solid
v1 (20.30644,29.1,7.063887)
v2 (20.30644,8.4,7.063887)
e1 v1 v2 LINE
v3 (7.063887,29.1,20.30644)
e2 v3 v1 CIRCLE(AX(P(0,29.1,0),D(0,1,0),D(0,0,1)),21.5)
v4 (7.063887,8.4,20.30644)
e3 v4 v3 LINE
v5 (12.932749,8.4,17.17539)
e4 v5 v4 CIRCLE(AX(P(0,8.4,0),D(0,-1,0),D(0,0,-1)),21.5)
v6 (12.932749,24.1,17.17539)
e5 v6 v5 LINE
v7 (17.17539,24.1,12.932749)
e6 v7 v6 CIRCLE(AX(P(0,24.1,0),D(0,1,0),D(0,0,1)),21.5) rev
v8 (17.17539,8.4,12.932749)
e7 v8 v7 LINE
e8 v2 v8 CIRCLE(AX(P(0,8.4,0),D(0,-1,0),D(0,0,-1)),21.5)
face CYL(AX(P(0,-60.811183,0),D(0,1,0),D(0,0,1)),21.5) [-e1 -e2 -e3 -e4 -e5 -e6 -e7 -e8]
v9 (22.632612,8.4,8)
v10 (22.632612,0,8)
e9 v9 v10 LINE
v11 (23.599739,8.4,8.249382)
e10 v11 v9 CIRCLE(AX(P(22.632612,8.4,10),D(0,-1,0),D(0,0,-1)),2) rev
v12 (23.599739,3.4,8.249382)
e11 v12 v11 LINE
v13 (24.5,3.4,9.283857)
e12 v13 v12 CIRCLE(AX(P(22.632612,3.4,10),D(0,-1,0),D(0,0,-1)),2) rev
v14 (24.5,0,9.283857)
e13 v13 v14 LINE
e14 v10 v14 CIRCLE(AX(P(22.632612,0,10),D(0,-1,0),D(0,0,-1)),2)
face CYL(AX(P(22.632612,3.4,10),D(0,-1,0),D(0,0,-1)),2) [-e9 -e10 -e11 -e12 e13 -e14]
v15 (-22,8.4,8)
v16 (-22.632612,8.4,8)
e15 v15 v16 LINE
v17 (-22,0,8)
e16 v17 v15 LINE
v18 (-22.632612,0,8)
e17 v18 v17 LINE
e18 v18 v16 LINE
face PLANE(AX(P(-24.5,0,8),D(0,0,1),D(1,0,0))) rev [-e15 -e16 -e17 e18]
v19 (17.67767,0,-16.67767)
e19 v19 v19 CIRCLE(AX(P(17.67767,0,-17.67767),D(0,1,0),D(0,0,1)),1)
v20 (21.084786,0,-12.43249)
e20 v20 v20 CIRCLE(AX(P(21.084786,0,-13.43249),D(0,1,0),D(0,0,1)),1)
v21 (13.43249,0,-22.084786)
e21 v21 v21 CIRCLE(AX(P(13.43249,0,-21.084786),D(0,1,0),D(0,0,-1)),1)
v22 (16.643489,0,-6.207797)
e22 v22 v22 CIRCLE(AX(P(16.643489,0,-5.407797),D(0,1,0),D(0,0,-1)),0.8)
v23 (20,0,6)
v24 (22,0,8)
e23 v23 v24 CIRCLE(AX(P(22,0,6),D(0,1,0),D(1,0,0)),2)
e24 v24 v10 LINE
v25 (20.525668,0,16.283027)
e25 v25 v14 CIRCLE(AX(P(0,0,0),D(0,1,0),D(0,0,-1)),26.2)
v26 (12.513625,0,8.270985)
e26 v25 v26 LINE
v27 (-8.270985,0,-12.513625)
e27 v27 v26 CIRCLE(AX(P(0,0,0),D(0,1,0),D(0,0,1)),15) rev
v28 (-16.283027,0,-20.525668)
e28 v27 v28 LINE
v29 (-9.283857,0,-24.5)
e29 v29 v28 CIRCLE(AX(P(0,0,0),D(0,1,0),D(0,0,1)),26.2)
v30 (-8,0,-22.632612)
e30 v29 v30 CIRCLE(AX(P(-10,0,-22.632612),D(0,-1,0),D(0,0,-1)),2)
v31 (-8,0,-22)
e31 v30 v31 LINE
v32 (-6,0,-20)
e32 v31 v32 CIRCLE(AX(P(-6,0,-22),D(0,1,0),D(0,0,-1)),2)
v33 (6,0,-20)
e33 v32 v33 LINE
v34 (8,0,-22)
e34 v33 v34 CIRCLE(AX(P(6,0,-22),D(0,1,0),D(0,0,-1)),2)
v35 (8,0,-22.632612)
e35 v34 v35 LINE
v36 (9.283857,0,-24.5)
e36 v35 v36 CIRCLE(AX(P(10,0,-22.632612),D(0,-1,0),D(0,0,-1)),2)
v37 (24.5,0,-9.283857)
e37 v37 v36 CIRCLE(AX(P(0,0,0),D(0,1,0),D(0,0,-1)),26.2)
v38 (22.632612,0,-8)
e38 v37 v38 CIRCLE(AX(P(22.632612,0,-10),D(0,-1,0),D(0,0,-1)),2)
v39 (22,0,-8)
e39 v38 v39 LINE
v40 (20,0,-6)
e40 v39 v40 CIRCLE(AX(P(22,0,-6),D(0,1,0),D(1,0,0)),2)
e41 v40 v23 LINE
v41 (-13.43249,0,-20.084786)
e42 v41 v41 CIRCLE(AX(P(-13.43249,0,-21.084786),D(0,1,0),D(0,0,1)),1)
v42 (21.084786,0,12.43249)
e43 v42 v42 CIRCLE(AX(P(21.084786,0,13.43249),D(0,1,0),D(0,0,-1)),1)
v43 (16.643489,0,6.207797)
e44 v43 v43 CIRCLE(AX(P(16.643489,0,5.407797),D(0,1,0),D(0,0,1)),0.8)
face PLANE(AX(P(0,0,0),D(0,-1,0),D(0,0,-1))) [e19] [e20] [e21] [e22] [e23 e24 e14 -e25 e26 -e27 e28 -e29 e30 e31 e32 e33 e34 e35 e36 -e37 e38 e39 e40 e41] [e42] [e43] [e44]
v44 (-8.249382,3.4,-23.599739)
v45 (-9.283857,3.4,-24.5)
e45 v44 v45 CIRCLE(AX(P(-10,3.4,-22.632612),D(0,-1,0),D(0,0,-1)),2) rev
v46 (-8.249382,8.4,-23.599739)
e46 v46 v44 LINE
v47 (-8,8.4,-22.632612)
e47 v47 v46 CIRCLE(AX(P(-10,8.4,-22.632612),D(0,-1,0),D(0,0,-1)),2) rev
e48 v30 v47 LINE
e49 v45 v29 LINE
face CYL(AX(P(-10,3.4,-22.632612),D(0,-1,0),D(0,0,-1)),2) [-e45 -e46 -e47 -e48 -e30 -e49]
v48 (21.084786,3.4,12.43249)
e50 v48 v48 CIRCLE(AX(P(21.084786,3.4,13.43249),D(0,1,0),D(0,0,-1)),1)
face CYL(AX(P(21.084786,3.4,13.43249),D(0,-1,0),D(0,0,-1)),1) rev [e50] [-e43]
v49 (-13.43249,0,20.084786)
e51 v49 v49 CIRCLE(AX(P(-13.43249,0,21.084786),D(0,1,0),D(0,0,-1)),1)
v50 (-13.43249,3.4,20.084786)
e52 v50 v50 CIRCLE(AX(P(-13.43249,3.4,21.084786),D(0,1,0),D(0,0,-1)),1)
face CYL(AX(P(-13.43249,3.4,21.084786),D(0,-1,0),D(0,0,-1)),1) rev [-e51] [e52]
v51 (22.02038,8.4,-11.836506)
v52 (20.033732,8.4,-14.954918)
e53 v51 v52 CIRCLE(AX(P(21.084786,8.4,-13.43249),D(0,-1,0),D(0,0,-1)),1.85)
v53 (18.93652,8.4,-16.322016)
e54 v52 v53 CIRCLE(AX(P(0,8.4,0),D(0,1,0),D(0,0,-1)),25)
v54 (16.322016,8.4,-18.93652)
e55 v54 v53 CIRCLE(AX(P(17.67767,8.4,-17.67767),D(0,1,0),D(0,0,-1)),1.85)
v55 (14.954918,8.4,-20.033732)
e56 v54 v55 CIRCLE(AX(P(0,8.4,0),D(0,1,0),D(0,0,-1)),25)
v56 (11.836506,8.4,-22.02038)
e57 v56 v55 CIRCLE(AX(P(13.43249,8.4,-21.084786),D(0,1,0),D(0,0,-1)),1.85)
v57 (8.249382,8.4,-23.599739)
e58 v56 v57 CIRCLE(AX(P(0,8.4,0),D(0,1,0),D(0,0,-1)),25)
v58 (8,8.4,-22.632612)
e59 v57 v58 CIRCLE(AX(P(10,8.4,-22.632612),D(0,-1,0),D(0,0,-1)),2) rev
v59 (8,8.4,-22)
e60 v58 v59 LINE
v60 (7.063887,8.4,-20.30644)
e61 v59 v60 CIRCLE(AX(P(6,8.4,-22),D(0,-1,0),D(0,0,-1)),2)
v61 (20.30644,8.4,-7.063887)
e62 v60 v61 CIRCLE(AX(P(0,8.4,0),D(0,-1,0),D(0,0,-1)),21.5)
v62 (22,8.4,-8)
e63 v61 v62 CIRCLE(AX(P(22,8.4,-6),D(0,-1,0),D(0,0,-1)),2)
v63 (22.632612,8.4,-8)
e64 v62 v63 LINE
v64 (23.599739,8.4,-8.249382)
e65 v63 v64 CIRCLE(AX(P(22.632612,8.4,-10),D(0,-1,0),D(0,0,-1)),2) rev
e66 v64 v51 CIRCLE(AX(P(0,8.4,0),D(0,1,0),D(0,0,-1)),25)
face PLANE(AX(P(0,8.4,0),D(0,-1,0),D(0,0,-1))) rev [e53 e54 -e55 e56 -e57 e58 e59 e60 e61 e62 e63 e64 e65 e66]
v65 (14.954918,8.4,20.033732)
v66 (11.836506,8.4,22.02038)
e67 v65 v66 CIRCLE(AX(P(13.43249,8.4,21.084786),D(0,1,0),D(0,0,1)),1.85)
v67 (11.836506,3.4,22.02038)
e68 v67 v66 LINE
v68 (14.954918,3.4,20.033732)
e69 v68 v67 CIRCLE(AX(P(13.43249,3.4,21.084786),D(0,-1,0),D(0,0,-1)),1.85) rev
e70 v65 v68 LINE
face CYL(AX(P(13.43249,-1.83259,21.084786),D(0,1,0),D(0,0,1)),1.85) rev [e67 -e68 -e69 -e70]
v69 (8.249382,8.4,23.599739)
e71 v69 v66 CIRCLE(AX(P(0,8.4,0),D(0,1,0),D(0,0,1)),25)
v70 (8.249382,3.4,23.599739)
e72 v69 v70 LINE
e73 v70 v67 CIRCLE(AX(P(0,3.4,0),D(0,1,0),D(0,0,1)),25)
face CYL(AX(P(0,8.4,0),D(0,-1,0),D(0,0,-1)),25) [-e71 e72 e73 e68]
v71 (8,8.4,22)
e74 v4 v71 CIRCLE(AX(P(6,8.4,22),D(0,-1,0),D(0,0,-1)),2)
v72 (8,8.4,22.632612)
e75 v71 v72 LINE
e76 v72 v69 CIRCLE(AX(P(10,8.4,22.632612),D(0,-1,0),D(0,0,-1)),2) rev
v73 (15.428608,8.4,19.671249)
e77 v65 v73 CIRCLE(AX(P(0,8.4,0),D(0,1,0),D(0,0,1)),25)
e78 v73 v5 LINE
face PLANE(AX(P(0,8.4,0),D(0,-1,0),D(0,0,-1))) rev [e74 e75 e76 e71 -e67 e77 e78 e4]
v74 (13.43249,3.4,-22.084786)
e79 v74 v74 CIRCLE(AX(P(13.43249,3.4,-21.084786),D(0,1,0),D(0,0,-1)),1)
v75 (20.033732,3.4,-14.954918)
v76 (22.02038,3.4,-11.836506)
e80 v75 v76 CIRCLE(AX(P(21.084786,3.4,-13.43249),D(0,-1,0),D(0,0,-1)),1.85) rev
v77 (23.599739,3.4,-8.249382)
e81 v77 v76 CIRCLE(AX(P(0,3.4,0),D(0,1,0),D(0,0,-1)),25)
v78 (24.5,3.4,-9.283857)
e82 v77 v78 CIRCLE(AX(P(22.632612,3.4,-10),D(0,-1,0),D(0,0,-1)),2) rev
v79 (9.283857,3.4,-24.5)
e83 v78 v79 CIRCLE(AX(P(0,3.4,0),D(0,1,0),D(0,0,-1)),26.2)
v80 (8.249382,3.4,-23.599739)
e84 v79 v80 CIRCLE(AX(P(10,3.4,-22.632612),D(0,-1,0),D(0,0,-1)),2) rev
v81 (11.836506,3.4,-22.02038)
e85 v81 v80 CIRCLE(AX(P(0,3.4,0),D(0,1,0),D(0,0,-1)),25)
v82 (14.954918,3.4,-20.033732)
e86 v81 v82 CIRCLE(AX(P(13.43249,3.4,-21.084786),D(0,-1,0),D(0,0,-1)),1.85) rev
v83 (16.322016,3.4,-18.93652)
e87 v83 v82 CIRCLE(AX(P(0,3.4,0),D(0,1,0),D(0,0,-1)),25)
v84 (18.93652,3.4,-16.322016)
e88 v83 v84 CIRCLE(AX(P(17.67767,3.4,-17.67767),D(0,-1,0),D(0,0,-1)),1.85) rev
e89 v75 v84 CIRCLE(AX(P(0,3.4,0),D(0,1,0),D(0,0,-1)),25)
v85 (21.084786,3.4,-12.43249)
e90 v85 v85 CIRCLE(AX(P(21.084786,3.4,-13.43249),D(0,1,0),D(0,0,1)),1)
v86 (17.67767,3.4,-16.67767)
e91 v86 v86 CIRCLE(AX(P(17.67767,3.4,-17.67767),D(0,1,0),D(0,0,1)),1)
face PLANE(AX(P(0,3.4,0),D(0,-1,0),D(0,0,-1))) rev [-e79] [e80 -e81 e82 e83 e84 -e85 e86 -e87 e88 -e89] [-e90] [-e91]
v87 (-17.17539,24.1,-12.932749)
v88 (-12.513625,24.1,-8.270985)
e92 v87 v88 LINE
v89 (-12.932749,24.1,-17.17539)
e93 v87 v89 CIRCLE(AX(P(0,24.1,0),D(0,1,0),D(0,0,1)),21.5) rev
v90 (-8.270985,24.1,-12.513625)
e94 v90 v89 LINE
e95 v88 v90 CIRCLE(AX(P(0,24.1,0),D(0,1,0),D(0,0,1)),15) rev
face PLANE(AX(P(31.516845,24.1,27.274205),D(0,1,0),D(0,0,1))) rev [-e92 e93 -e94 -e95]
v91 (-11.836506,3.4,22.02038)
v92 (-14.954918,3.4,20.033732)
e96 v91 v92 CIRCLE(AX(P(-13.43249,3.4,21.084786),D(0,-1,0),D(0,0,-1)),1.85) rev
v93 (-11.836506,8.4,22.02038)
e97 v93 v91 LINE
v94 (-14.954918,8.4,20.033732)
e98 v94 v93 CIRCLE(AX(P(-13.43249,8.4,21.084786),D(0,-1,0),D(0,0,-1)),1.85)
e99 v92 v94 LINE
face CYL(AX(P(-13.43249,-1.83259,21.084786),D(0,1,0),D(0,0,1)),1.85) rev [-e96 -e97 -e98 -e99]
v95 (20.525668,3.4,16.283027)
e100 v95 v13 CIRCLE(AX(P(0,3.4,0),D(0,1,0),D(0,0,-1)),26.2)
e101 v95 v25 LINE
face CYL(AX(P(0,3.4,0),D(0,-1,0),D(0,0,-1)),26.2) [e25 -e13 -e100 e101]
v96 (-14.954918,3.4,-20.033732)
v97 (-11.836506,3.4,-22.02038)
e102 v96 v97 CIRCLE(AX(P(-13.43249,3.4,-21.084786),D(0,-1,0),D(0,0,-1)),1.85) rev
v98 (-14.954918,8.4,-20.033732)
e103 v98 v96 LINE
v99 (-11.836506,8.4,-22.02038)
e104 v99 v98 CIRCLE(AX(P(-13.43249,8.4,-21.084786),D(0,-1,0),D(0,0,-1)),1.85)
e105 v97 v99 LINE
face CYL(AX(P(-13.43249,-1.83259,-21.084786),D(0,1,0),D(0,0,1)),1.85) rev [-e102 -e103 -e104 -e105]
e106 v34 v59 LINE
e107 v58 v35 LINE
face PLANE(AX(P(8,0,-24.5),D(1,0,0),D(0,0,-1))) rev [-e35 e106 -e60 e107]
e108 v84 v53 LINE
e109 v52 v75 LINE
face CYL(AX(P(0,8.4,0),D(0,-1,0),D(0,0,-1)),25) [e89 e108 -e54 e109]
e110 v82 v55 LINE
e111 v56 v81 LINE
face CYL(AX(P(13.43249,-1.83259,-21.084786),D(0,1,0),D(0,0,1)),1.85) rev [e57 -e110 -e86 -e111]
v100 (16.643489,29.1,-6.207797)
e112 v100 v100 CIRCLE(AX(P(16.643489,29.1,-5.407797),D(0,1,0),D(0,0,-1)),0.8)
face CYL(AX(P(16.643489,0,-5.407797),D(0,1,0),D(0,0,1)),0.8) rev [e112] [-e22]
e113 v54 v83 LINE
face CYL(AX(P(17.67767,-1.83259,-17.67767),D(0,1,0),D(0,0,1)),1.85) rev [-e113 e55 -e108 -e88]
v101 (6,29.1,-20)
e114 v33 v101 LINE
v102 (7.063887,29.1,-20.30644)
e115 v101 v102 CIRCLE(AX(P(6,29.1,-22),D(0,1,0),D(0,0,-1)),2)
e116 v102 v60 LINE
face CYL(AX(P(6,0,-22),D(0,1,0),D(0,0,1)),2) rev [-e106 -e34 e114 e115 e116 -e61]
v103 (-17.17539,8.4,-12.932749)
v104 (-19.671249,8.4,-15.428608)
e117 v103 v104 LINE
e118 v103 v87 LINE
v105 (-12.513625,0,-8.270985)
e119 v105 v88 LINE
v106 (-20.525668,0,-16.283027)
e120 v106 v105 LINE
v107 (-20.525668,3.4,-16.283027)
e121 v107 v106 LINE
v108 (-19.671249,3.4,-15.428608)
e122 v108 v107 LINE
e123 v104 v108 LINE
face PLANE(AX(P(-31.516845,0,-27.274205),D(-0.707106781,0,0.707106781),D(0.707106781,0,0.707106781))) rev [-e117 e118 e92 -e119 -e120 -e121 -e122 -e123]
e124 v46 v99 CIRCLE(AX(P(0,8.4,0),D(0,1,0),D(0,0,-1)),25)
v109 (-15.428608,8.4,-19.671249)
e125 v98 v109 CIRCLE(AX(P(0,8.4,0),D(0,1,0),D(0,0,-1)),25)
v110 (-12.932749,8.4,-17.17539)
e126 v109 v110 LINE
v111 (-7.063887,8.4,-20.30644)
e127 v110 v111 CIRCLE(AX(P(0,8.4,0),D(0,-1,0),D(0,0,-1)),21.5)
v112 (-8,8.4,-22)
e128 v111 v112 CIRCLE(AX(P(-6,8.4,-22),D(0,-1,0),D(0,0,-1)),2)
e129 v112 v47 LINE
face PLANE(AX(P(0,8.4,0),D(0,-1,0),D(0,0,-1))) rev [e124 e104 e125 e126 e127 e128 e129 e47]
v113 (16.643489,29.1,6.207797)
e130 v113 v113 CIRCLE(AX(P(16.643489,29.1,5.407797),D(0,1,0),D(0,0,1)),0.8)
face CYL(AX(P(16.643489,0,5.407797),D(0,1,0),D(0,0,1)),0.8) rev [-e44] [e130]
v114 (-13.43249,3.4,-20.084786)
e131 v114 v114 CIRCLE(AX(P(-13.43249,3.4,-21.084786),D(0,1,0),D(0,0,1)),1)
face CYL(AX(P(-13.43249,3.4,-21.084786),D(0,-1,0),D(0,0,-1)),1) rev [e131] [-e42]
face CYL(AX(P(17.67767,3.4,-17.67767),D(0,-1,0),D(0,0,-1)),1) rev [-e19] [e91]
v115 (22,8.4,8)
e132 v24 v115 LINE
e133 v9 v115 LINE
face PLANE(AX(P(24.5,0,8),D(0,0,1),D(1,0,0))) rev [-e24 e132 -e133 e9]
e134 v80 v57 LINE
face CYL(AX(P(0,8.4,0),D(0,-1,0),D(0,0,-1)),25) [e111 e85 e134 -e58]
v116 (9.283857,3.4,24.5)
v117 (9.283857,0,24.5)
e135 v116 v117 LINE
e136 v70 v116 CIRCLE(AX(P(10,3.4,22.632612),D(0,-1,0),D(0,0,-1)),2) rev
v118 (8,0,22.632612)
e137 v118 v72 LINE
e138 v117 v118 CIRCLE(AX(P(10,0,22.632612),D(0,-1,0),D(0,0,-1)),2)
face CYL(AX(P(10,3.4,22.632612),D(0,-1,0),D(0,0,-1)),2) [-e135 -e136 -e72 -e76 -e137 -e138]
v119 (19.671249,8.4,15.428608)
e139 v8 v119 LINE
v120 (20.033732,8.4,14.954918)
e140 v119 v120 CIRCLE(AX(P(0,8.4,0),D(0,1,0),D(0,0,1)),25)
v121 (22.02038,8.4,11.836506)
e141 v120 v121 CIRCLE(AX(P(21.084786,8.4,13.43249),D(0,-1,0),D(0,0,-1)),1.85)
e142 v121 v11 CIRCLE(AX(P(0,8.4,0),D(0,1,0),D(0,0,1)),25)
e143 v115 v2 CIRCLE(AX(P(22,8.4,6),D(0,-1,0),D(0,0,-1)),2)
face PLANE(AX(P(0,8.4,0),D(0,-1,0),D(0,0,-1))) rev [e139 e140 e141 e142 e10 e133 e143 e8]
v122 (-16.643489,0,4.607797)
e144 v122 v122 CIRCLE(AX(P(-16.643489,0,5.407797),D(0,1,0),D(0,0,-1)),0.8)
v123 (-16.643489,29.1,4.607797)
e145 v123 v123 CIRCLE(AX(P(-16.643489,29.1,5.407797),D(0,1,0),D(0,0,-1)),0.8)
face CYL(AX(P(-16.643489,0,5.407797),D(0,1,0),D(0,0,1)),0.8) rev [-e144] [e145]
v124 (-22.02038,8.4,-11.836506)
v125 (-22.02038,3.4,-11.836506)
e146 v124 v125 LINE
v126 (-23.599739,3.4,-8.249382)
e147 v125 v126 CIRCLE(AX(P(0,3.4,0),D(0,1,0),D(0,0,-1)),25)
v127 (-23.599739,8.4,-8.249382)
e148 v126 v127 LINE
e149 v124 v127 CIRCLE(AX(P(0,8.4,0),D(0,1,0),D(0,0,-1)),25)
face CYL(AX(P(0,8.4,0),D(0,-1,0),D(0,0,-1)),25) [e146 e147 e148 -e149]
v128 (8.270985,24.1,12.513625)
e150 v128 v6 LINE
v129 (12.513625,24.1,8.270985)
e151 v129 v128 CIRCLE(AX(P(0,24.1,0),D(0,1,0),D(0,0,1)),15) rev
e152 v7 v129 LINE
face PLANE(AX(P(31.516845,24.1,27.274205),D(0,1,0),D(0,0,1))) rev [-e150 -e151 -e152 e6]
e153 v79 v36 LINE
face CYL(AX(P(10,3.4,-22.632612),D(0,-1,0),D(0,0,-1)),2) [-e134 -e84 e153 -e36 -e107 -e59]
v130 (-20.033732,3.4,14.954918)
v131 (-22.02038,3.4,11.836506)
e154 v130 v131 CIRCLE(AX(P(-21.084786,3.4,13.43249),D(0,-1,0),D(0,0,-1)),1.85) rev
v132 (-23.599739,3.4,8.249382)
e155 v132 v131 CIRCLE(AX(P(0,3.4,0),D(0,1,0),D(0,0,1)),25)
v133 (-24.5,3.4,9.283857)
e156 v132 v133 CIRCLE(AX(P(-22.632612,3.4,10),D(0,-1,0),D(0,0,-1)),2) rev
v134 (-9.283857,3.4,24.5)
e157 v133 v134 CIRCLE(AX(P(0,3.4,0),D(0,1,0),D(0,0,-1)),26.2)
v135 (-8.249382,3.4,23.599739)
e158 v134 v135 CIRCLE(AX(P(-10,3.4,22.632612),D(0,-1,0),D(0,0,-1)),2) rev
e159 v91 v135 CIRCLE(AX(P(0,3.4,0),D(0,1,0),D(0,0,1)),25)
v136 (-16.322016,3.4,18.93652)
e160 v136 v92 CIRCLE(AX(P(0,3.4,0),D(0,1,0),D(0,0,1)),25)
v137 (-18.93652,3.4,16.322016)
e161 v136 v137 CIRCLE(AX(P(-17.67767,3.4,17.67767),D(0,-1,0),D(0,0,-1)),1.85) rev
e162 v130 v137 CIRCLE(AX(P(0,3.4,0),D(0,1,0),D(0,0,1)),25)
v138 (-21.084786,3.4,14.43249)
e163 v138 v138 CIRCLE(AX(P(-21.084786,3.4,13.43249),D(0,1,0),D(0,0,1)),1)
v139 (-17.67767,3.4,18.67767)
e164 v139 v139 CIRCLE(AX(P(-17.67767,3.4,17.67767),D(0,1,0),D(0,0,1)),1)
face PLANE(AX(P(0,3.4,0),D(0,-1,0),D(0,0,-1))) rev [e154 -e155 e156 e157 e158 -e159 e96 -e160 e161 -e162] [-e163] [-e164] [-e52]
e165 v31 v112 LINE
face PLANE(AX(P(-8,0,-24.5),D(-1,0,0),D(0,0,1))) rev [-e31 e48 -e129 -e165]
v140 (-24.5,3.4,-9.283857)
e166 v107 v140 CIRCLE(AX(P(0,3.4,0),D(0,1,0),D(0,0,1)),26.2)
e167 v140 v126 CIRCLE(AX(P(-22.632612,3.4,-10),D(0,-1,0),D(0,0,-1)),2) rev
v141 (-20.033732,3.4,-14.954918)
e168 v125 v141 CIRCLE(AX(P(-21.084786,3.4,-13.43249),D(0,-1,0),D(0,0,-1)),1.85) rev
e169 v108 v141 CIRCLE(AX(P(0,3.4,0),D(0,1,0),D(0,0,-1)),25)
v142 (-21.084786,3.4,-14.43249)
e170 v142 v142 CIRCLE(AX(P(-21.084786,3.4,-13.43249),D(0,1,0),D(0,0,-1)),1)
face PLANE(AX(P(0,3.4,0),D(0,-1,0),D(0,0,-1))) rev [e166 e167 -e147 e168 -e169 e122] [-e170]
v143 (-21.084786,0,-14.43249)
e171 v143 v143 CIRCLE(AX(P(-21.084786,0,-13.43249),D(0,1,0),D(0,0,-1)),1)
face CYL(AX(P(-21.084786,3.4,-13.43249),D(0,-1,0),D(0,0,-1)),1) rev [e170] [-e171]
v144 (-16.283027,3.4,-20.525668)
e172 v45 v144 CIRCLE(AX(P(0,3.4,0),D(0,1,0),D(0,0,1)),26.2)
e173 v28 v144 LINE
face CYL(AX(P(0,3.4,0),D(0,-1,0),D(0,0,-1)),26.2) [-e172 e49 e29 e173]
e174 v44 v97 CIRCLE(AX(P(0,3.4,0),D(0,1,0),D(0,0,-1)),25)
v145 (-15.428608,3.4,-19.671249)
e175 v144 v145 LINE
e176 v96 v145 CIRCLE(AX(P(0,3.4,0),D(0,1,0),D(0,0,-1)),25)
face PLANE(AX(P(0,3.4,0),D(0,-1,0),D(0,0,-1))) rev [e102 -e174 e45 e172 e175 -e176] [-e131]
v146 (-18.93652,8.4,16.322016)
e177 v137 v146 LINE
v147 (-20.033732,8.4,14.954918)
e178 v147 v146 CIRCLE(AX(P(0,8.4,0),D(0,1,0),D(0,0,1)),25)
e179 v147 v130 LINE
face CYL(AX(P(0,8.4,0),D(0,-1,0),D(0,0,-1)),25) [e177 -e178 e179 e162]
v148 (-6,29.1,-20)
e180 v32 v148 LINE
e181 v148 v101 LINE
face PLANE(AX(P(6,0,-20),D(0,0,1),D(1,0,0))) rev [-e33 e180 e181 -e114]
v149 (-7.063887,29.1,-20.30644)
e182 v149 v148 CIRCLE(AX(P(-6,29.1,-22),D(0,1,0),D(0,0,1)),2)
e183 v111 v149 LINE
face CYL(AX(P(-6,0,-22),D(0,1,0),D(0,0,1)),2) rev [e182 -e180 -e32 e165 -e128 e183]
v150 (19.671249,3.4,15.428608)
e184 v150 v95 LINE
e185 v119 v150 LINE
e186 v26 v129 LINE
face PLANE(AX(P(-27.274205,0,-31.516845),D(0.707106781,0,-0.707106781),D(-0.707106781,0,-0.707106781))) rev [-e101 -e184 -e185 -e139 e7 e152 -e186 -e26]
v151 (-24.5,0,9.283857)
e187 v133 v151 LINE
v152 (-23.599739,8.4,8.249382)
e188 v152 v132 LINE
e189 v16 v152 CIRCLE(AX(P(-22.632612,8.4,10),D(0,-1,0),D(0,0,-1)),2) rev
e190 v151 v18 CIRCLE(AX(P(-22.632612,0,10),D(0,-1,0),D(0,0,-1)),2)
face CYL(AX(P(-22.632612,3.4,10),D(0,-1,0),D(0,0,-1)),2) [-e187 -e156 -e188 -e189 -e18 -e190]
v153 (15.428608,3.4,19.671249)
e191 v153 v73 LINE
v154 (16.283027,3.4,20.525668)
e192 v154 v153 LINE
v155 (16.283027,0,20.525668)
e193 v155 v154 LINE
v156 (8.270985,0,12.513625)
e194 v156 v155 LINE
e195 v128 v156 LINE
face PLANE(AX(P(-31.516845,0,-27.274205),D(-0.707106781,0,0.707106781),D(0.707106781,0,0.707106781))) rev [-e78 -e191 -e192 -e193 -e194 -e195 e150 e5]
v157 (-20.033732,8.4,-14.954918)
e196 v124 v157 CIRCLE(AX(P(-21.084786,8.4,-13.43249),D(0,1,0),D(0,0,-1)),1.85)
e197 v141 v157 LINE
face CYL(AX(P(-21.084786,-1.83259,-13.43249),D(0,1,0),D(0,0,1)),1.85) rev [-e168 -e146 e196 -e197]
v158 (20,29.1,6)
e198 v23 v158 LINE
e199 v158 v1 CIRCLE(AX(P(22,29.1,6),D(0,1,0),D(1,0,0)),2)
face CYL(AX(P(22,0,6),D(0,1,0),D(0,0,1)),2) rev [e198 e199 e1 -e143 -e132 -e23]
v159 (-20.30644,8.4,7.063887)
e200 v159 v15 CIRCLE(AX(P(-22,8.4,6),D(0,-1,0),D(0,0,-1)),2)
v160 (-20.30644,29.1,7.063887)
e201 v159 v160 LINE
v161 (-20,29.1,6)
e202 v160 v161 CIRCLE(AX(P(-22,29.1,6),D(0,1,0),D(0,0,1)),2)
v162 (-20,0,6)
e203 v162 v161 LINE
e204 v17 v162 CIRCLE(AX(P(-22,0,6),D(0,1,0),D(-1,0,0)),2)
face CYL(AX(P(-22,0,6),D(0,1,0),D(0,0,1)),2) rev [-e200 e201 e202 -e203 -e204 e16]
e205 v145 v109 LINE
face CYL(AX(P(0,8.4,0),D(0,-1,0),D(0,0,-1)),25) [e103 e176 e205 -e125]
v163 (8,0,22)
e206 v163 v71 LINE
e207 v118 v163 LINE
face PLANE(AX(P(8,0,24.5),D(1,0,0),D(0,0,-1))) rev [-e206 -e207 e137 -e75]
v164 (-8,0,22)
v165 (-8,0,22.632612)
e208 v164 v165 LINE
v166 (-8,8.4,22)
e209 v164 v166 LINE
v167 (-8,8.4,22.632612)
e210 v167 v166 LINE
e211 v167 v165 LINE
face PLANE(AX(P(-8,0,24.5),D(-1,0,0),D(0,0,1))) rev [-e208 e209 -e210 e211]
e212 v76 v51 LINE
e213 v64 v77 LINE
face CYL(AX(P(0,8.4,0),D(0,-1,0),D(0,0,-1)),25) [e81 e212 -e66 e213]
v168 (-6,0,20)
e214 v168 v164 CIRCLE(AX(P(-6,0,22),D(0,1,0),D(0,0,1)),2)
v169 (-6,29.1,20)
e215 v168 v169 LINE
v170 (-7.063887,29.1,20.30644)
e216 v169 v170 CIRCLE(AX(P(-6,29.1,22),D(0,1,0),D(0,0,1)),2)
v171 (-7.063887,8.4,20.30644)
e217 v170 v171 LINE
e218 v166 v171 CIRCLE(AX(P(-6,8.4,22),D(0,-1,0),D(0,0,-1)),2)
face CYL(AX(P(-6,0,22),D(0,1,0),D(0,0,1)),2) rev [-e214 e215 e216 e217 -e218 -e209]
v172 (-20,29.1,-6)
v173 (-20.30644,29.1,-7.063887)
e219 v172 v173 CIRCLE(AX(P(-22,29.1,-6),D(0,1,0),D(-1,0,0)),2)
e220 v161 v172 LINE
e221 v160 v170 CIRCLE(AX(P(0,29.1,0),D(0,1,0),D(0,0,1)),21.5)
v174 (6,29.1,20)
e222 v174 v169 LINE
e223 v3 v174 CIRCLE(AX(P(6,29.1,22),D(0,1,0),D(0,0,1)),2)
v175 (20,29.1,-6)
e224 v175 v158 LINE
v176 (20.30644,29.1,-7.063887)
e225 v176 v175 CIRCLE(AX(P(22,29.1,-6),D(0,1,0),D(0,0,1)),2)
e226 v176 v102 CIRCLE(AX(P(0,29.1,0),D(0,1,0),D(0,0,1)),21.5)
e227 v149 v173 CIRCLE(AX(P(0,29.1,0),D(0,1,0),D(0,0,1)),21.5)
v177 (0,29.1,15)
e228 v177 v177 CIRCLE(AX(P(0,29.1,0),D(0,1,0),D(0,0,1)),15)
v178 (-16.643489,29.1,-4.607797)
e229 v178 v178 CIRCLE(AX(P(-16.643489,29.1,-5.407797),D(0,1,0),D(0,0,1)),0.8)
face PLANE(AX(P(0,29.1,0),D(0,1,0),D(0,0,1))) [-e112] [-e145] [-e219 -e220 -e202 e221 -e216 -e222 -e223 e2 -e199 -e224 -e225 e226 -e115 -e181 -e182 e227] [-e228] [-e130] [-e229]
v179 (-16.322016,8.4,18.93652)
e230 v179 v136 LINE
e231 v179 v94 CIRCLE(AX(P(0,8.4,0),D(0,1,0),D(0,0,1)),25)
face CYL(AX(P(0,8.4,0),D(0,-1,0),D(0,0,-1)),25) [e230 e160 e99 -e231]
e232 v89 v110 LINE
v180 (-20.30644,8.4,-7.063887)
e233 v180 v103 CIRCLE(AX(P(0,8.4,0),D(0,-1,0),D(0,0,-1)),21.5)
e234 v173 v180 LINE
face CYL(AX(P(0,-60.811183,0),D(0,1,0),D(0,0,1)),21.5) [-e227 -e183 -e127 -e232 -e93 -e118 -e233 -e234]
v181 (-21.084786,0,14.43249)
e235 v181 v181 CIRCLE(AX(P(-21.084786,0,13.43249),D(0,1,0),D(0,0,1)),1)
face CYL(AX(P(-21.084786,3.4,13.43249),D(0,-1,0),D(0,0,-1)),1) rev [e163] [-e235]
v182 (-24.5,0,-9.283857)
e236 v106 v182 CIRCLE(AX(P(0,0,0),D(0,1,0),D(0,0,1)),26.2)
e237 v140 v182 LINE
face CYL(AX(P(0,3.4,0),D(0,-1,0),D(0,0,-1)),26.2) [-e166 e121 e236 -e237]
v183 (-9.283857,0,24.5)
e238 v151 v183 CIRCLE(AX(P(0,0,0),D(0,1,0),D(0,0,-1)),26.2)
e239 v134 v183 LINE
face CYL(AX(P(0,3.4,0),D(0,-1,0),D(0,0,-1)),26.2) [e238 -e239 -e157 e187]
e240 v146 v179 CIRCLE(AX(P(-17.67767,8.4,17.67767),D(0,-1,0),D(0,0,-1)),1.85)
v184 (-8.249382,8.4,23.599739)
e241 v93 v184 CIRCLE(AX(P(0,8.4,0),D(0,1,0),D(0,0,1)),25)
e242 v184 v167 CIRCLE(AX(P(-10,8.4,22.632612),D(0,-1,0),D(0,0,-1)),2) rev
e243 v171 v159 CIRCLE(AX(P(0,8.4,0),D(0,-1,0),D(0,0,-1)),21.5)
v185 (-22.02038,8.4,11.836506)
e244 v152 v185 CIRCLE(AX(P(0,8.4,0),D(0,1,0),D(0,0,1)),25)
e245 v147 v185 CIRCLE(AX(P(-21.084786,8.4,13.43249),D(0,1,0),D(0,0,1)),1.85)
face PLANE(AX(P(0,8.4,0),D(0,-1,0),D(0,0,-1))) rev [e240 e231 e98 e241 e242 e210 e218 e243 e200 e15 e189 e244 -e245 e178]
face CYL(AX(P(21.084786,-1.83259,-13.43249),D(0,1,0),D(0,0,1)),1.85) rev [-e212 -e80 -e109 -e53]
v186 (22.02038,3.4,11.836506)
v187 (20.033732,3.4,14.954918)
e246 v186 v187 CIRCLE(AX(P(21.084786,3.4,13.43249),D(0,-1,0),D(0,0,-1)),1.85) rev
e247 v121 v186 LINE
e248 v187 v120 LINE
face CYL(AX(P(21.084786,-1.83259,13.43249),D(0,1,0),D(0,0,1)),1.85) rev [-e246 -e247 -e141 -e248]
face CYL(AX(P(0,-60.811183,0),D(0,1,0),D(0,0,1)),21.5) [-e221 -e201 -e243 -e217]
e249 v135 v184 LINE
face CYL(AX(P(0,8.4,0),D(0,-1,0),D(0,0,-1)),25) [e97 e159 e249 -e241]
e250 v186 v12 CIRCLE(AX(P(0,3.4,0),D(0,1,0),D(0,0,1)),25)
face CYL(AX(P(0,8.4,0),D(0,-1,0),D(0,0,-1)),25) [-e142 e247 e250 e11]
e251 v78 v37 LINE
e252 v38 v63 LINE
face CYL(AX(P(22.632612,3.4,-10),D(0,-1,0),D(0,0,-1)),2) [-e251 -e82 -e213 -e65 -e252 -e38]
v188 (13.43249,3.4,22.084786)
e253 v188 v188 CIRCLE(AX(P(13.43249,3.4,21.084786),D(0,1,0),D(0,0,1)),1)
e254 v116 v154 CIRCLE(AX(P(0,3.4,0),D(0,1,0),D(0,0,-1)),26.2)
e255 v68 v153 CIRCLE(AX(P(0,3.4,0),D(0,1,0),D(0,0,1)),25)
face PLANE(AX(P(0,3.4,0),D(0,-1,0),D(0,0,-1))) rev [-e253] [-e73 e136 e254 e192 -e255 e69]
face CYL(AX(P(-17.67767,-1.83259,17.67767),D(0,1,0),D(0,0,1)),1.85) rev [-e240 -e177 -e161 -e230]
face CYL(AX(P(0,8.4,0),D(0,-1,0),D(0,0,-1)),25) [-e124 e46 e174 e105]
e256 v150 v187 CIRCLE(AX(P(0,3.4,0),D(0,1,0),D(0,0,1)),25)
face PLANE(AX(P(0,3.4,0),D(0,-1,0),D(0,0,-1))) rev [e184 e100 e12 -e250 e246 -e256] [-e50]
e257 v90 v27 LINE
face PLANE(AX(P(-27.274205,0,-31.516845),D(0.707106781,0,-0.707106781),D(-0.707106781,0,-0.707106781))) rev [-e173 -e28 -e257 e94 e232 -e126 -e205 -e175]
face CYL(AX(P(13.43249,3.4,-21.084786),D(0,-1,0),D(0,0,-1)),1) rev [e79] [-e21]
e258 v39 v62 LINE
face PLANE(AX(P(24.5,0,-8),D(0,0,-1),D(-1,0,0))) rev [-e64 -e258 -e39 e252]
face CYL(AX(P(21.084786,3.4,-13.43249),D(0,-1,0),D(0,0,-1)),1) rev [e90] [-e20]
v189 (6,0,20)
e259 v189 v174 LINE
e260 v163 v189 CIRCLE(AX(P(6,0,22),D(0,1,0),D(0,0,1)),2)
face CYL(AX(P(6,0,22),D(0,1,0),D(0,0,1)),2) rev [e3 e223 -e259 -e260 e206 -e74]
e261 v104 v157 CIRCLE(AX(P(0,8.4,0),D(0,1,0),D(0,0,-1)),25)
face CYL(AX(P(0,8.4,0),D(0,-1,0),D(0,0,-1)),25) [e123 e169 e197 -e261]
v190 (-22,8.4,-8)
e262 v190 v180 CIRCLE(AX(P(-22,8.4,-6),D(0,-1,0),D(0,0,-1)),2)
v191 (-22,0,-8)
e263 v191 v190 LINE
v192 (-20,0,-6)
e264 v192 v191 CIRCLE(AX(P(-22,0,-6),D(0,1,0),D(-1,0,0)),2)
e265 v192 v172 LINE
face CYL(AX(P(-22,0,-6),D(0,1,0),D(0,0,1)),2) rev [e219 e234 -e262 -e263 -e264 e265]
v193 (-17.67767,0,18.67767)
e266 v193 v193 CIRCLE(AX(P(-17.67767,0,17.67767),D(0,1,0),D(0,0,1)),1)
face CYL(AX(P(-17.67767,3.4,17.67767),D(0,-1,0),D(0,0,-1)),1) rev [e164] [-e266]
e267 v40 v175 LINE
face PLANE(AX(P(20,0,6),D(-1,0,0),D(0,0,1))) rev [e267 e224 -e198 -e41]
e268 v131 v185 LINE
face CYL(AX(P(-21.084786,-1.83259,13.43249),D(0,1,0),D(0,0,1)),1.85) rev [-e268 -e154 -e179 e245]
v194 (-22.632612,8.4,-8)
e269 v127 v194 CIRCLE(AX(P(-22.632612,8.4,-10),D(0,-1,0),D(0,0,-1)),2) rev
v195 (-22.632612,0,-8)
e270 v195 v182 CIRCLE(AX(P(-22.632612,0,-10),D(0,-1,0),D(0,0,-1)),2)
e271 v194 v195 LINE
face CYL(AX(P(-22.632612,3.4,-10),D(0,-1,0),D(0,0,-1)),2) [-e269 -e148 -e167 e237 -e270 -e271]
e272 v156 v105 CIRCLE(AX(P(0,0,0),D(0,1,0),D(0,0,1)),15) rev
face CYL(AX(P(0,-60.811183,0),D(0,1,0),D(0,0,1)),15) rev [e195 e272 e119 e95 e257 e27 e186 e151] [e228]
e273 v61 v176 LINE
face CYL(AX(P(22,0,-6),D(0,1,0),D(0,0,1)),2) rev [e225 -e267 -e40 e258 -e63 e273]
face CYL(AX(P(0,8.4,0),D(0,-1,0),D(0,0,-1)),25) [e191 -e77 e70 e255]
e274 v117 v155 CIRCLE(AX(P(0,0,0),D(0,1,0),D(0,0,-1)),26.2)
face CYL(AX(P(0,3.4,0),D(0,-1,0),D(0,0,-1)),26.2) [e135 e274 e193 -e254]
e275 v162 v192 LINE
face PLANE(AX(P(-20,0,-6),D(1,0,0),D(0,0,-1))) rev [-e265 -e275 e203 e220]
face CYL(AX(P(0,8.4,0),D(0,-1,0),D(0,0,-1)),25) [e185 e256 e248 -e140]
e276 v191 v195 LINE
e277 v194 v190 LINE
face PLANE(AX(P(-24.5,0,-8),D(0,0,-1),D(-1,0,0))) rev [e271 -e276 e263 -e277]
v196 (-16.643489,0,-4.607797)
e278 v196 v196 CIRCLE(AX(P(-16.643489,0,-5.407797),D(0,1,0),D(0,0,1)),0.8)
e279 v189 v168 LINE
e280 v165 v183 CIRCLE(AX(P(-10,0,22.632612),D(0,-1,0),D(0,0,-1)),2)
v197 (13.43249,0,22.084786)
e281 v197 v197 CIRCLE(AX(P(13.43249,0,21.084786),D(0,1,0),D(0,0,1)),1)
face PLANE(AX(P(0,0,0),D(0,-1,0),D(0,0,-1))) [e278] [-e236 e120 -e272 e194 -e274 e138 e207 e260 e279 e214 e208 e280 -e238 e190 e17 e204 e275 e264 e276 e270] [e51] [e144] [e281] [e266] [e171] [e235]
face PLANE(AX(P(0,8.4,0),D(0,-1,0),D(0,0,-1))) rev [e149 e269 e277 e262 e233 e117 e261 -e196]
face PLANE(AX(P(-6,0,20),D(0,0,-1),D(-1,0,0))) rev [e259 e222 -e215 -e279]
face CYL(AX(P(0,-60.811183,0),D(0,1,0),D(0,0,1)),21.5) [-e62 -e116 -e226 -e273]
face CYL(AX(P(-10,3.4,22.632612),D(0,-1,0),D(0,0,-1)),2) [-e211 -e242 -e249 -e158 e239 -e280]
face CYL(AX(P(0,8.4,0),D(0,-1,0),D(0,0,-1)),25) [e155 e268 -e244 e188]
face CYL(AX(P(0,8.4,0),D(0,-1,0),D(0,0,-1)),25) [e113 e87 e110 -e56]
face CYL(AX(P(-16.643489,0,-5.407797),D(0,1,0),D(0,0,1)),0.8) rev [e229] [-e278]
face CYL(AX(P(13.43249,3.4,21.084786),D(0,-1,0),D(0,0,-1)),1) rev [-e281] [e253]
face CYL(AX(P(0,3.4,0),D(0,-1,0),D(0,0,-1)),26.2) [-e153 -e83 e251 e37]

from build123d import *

# Parameters (mm, degrees)
SKETCH1_R                     = 1
BOSS_EXTRUDE1_DEPTH           = 3.4
BOSS_EXTRUDE3_DEPTH           = 5
SKETCH4_R                     = 1.85
CUT_EXTRUDE1_DEPTH            = 5
SKETCH9_R                     = 19
CENTER_HOLE_DEPTH             = 36.651928419
SKETCH2_R                     = 21.5
SKETCH2_R_2                   = 15
BOSS_EXTRUDE2_DEPTH           = 29.1
SKETCH27_R                    = 0.8
TOP_FACE_MOUNTING_HOLES_DEPTH = 46.247209859
CUT_EXTRUDE17_DEPTH           = 43.205568353
CUT_EXTRUDE10_DEPTH           = 41.360748259
CIRPATTERN3_COUNT             = 4
FILLET8_START                 = -1
FILLET8_DEPTH                 = 9.4


with BuildPart() as part:
    # Sketch1 → Boss-Extrude1 (new body)
    with BuildSketch(Plane(origin=(0, 0, 0), x_dir=(1, 0, 0), z_dir=(0, 1, 0))):
        with BuildLine():
            Line((9.283856957, 24.5), (-9.283856957, 24.5))
            ThreePointArc((-9.283856957, 24.5), (-18.526197667, 18.526197667), (-24.5, 9.283856957))
            Line((-24.5, 9.283856957), (-24.5, -9.283856957))
            ThreePointArc((-24.5, -9.283856957), (-18.526197667, -18.526197667), (-9.283856957, -24.5))
            Line((-9.283856957, -24.5), (9.283856957, -24.5))
            ThreePointArc((9.283856957, -24.5), (18.526197667, -18.526197667), (24.5, -9.283856957))
            Line((24.5, -9.283856957), (24.5, 9.283856957))
            ThreePointArc((24.5, 9.283856957), (18.526197667, 18.526197667), (9.283856957, 24.5))
        make_face()
        with Locations(Location((-13.432490209, 21.084786145, 0), (0, 0, 270))):
            Circle(SKETCH1_R, mode=Mode.SUBTRACT)
        with Locations(Location((-17.67766953, 17.67766953, 0), (0, 0, 270))):
            Circle(SKETCH1_R, mode=Mode.SUBTRACT)
        with Locations(Location((-21.084786145, 13.432490209, 0), (0, 0, 90))):
            Circle(SKETCH1_R, mode=Mode.SUBTRACT)
        with Locations(Location((21.084786145, 13.432490209, 0), (0, 0, 270))):
            Circle(SKETCH1_R, mode=Mode.SUBTRACT)
        with Locations(Location((17.67766953, 17.67766953, 0), (0, 0, 270))):
            Circle(SKETCH1_R, mode=Mode.SUBTRACT)
        with Locations(Location((13.432490209, 21.084786145, 0), (0, 0, 90))):
            Circle(SKETCH1_R, mode=Mode.SUBTRACT)
        with Locations(Location((13.432490209, -21.084786145, 0), (0, 0, 270))):
            Circle(SKETCH1_R, mode=Mode.SUBTRACT)
        with Locations(Location((17.67766953, -17.67766953, 0), (0, 0, 270))):
            Circle(SKETCH1_R, mode=Mode.SUBTRACT)
        with Locations(Location((21.084786145, -13.432490209, 0), (0, 0, 90))):
            Circle(SKETCH1_R, mode=Mode.SUBTRACT)
        with Locations(Location((-21.084786145, -13.432490209, 0), (0, 0, 270))):
            Circle(SKETCH1_R, mode=Mode.SUBTRACT)
        with Locations(Location((-17.67766953, -17.67766953, 0), (0, 0, 270))):
            Circle(SKETCH1_R, mode=Mode.SUBTRACT)
        with Locations(Location((-13.432490209, -21.084786145, 0), (0, 0, 90))):
            Circle(SKETCH1_R, mode=Mode.SUBTRACT)
    extrude(amount=BOSS_EXTRUDE1_DEPTH)

    # Sketch3 → Boss-Extrude3 (add)
    with BuildSketch(Plane(origin=(0, 3.4, 0), x_dir=(1, 0, 0), z_dir=(0, 1, 0))):
        with BuildLine():
            Line((-24.5, 4.974937186), (-24.5, -4.974937186))
            ThreePointArc((-24.5, -4.974937186), (-17.67766953, -17.67766953), (-4.974937186, -24.5))
            Line((-4.974937186, -24.5), (4.974937186, -24.5))
            ThreePointArc((4.974937186, -24.5), (17.67766953, -17.67766953), (24.5, -4.974937186))
            Line((24.5, -4.974937186), (24.5, 4.974937186))
            ThreePointArc((24.5, 4.974937186), (17.67766953, 17.67766953), (4.974937186, 24.5))
            Line((4.974937186, 24.5), (-4.974937186, 24.5))
            ThreePointArc((-4.974937186, 24.5), (-17.67766953, 17.67766953), (-24.5, 4.974937186))
        make_face()
    extrude(amount=BOSS_EXTRUDE3_DEPTH)

    # Sketch4 → Cut-Extrude1 (cut)
    with BuildSketch(Plane(origin=(0, 8.4, 0), x_dir=(1, 0, 0), z_dir=(0, 1, 0))):
        with Locations((-17.67766953, 17.67766953)):
            Circle(SKETCH4_R)
        with Locations((-13.432490209, 21.084786145)):
            Circle(SKETCH4_R)
        with Locations((-21.084786145, 13.432490209)):
            Circle(SKETCH4_R)
        with Locations((21.084786145, 13.432490209)):
            Circle(SKETCH4_R)
        with Locations((17.67766953, 17.67766953)):
            Circle(SKETCH4_R)
        with Locations((13.432490209, 21.084786145)):
            Circle(SKETCH4_R)
        with Locations((13.432490209, -21.084786145)):
            Circle(SKETCH4_R)
        with Locations((17.67766953, -17.67766953)):
            Circle(SKETCH4_R)
        with Locations((21.084786145, -13.432490209)):
            Circle(SKETCH4_R)
        with Locations((-21.084786145, -13.432490209)):
            Circle(SKETCH4_R)
        with Locations((-13.432490209, -21.084786145)):
            Circle(SKETCH4_R)
        with Locations((-17.67766953, -17.67766953)):
            Circle(SKETCH4_R)
    extrude(amount=-CUT_EXTRUDE1_DEPTH, mode=Mode.SUBTRACT)

    # Sketch9 → Center Hole (cut, through all)
    with BuildSketch(Plane(origin=(0, 8.4, 0), x_dir=(1, 0, 0), z_dir=(0, 1, 0))):
        with Locations(Location((0, 0, 0), (0, 0, 270))):
            Circle(SKETCH9_R)
    extrude(amount=-CENTER_HOLE_DEPTH, mode=Mode.SUBTRACT)

    # Sketch2 → Boss-Extrude2 (add)
    with BuildSketch(Plane(origin=(0, 29.1, 0), x_dir=(-1, 0, 0), z_dir=(0, 1, 0))):
        with Locations(Location((0, 0, 0), (0, 0, 90))):
            Circle(SKETCH2_R)
        with Locations(Location((0, 0, 0), (0, 0, 90))):
            Circle(SKETCH2_R_2, mode=Mode.SUBTRACT)
    extrude(amount=-BOSS_EXTRUDE2_DEPTH)

    # Sketch27 → Top Face Mounting Holes (cut, through all)
    with BuildSketch(Plane(origin=(0, 29.1, 0), x_dir=(1, 0, 0), z_dir=(0, 1, 0))):
        with Locations(Location((-16.643489035, 5.407797402, 0), (0, 0, 270))):
            Circle(SKETCH27_R)
        with Locations(Location((-16.643489035, -5.407797402, 0), (0, 0, 90))):
            Circle(SKETCH27_R)
        with Locations(Location((16.643489035, -5.407797402, 0), (0, 0, 270))):
            Circle(SKETCH27_R)
        with Locations(Location((16.643489035, 5.407797402, 0), (0, 0, 90))):
            Circle(SKETCH27_R)
    extrude(amount=-TOP_FACE_MOUNTING_HOLES_DEPTH, mode=Mode.SUBTRACT)

    # Sketch28 → Cut-Extrude17 (cut, through all)
    with BuildSketch(Plane(origin=(0, 24.1, 0), x_dir=(1, 0, 0), z_dir=(0, 1, 0))):
        Polygon((-31.516845347, 27.27420466), (27.27420466, -31.516845347), (31.516845347, -27.27420466), (-27.27420466, 31.516845347), align=None)
    extrude(amount=-CUT_EXTRUDE17_DEPTH, mode=Mode.SUBTRACT)

    # Sketch22 → Cut-Extrude10 (cut, symmetric)
    with BuildSketch(Plane(origin=(0, 8.4, 0), x_dir=(1, 0, 0), z_dir=(0, 1, 0))):
        with BuildLine():
            Line((8, 24.5), (-8, 24.5))
            Line((-8, 24.5), (-8, 22))
            ThreePointArc((-8, 22), (-7.414213562, 20.585786438), (-6, 20))
            Line((-6, 20), (6, 20))
            ThreePointArc((6, 20), (7.414213562, 20.585786438), (8, 22))
            Line((8, 22), (8, 24.5))
        make_face()
    cut_extrude10 = extrude(amount=CUT_EXTRUDE10_DEPTH, both=True, mode=Mode.SUBTRACT)

    # CirPattern3: Cut-Extrude10 ×4 about axis
    cirpattern3_axis = Axis((0, 0, 0), (0, 1, 0))
    for i in range(1, CIRPATTERN3_COUNT):
        add(cut_extrude10.rotate(cirpattern3_axis, i * 360 / CIRPATTERN3_COUNT), mode=Mode.SUBTRACT)

    # Fillet8: read off the stored shape, not the designer's step
    # Fillet8 outline → Fillet8 (cut)
    with BuildSketch(Plane(origin=(0, 0, 0), x_dir=(1, 0, 0), z_dir=(0, 1, 0)).offset(FILLET8_START)):
        with BuildLine():
            Line((24.5, 8), (24.5, 9.283856957))
            ThreePointArc((24.5, 9.283856957), (23.765685797, 8.351927476), (22.632611679, 8))
            Line((22.632611679, 8), (24.5, 8))
        make_face()
        with BuildLine():
            Line((24.5, -8), (22.632611679, -8))
            ThreePointArc((22.632611679, -8), (23.765685797, -8.351927476), (24.5, -9.283856957))
            Line((24.5, -9.283856957), (24.5, -8))
        make_face()
        with BuildLine():
            Line((8, -24.5), (9.283856957, -24.5))
            ThreePointArc((9.283856957, -24.5), (8.351927476, -23.765685797), (8, -22.632611679))
            Line((8, -22.632611679), (8, -24.5))
        make_face()
        with BuildLine():
            Line((-8, -24.5), (-8, -22.632611679))
            ThreePointArc((-8, -22.632611679), (-8.351927476, -23.765685797), (-9.283856957, -24.5))
            Line((-9.283856957, -24.5), (-8, -24.5))
        make_face()
        with BuildLine():
            Line((-24.5, -8), (-24.5, -9.283856957))
            ThreePointArc((-24.5, -9.283856957), (-23.765685797, -8.351927476), (-22.632611679, -8))
            Line((-22.632611679, -8), (-24.5, -8))
        make_face()
        with BuildLine():
            Line((-24.5, 8), (-22.632611679, 8))
            ThreePointArc((-22.632611679, 8), (-23.765685797, 8.351927476), (-24.5, 9.283856957))
            Line((-24.5, 9.283856957), (-24.5, 8))
        make_face()
        with BuildLine():
            Line((8, 24.5), (8, 22.632611679))
            ThreePointArc((8, 22.632611679), (8.351927476, 23.765685797), (9.283856957, 24.5))
            Line((9.283856957, 24.5), (8, 24.5))
        make_face()
        with BuildLine():
            Line((-8, 24.5), (-9.283856957, 24.5))
            ThreePointArc((-9.283856957, 24.5), (-8.351927476, 23.765685797), (-8, 22.632611679))
            Line((-8, 22.632611679), (-8, 24.5))
        make_face()
    extrude(amount=FILLET8_DEPTH, mode=Mode.SUBTRACT)


solid = part.part
